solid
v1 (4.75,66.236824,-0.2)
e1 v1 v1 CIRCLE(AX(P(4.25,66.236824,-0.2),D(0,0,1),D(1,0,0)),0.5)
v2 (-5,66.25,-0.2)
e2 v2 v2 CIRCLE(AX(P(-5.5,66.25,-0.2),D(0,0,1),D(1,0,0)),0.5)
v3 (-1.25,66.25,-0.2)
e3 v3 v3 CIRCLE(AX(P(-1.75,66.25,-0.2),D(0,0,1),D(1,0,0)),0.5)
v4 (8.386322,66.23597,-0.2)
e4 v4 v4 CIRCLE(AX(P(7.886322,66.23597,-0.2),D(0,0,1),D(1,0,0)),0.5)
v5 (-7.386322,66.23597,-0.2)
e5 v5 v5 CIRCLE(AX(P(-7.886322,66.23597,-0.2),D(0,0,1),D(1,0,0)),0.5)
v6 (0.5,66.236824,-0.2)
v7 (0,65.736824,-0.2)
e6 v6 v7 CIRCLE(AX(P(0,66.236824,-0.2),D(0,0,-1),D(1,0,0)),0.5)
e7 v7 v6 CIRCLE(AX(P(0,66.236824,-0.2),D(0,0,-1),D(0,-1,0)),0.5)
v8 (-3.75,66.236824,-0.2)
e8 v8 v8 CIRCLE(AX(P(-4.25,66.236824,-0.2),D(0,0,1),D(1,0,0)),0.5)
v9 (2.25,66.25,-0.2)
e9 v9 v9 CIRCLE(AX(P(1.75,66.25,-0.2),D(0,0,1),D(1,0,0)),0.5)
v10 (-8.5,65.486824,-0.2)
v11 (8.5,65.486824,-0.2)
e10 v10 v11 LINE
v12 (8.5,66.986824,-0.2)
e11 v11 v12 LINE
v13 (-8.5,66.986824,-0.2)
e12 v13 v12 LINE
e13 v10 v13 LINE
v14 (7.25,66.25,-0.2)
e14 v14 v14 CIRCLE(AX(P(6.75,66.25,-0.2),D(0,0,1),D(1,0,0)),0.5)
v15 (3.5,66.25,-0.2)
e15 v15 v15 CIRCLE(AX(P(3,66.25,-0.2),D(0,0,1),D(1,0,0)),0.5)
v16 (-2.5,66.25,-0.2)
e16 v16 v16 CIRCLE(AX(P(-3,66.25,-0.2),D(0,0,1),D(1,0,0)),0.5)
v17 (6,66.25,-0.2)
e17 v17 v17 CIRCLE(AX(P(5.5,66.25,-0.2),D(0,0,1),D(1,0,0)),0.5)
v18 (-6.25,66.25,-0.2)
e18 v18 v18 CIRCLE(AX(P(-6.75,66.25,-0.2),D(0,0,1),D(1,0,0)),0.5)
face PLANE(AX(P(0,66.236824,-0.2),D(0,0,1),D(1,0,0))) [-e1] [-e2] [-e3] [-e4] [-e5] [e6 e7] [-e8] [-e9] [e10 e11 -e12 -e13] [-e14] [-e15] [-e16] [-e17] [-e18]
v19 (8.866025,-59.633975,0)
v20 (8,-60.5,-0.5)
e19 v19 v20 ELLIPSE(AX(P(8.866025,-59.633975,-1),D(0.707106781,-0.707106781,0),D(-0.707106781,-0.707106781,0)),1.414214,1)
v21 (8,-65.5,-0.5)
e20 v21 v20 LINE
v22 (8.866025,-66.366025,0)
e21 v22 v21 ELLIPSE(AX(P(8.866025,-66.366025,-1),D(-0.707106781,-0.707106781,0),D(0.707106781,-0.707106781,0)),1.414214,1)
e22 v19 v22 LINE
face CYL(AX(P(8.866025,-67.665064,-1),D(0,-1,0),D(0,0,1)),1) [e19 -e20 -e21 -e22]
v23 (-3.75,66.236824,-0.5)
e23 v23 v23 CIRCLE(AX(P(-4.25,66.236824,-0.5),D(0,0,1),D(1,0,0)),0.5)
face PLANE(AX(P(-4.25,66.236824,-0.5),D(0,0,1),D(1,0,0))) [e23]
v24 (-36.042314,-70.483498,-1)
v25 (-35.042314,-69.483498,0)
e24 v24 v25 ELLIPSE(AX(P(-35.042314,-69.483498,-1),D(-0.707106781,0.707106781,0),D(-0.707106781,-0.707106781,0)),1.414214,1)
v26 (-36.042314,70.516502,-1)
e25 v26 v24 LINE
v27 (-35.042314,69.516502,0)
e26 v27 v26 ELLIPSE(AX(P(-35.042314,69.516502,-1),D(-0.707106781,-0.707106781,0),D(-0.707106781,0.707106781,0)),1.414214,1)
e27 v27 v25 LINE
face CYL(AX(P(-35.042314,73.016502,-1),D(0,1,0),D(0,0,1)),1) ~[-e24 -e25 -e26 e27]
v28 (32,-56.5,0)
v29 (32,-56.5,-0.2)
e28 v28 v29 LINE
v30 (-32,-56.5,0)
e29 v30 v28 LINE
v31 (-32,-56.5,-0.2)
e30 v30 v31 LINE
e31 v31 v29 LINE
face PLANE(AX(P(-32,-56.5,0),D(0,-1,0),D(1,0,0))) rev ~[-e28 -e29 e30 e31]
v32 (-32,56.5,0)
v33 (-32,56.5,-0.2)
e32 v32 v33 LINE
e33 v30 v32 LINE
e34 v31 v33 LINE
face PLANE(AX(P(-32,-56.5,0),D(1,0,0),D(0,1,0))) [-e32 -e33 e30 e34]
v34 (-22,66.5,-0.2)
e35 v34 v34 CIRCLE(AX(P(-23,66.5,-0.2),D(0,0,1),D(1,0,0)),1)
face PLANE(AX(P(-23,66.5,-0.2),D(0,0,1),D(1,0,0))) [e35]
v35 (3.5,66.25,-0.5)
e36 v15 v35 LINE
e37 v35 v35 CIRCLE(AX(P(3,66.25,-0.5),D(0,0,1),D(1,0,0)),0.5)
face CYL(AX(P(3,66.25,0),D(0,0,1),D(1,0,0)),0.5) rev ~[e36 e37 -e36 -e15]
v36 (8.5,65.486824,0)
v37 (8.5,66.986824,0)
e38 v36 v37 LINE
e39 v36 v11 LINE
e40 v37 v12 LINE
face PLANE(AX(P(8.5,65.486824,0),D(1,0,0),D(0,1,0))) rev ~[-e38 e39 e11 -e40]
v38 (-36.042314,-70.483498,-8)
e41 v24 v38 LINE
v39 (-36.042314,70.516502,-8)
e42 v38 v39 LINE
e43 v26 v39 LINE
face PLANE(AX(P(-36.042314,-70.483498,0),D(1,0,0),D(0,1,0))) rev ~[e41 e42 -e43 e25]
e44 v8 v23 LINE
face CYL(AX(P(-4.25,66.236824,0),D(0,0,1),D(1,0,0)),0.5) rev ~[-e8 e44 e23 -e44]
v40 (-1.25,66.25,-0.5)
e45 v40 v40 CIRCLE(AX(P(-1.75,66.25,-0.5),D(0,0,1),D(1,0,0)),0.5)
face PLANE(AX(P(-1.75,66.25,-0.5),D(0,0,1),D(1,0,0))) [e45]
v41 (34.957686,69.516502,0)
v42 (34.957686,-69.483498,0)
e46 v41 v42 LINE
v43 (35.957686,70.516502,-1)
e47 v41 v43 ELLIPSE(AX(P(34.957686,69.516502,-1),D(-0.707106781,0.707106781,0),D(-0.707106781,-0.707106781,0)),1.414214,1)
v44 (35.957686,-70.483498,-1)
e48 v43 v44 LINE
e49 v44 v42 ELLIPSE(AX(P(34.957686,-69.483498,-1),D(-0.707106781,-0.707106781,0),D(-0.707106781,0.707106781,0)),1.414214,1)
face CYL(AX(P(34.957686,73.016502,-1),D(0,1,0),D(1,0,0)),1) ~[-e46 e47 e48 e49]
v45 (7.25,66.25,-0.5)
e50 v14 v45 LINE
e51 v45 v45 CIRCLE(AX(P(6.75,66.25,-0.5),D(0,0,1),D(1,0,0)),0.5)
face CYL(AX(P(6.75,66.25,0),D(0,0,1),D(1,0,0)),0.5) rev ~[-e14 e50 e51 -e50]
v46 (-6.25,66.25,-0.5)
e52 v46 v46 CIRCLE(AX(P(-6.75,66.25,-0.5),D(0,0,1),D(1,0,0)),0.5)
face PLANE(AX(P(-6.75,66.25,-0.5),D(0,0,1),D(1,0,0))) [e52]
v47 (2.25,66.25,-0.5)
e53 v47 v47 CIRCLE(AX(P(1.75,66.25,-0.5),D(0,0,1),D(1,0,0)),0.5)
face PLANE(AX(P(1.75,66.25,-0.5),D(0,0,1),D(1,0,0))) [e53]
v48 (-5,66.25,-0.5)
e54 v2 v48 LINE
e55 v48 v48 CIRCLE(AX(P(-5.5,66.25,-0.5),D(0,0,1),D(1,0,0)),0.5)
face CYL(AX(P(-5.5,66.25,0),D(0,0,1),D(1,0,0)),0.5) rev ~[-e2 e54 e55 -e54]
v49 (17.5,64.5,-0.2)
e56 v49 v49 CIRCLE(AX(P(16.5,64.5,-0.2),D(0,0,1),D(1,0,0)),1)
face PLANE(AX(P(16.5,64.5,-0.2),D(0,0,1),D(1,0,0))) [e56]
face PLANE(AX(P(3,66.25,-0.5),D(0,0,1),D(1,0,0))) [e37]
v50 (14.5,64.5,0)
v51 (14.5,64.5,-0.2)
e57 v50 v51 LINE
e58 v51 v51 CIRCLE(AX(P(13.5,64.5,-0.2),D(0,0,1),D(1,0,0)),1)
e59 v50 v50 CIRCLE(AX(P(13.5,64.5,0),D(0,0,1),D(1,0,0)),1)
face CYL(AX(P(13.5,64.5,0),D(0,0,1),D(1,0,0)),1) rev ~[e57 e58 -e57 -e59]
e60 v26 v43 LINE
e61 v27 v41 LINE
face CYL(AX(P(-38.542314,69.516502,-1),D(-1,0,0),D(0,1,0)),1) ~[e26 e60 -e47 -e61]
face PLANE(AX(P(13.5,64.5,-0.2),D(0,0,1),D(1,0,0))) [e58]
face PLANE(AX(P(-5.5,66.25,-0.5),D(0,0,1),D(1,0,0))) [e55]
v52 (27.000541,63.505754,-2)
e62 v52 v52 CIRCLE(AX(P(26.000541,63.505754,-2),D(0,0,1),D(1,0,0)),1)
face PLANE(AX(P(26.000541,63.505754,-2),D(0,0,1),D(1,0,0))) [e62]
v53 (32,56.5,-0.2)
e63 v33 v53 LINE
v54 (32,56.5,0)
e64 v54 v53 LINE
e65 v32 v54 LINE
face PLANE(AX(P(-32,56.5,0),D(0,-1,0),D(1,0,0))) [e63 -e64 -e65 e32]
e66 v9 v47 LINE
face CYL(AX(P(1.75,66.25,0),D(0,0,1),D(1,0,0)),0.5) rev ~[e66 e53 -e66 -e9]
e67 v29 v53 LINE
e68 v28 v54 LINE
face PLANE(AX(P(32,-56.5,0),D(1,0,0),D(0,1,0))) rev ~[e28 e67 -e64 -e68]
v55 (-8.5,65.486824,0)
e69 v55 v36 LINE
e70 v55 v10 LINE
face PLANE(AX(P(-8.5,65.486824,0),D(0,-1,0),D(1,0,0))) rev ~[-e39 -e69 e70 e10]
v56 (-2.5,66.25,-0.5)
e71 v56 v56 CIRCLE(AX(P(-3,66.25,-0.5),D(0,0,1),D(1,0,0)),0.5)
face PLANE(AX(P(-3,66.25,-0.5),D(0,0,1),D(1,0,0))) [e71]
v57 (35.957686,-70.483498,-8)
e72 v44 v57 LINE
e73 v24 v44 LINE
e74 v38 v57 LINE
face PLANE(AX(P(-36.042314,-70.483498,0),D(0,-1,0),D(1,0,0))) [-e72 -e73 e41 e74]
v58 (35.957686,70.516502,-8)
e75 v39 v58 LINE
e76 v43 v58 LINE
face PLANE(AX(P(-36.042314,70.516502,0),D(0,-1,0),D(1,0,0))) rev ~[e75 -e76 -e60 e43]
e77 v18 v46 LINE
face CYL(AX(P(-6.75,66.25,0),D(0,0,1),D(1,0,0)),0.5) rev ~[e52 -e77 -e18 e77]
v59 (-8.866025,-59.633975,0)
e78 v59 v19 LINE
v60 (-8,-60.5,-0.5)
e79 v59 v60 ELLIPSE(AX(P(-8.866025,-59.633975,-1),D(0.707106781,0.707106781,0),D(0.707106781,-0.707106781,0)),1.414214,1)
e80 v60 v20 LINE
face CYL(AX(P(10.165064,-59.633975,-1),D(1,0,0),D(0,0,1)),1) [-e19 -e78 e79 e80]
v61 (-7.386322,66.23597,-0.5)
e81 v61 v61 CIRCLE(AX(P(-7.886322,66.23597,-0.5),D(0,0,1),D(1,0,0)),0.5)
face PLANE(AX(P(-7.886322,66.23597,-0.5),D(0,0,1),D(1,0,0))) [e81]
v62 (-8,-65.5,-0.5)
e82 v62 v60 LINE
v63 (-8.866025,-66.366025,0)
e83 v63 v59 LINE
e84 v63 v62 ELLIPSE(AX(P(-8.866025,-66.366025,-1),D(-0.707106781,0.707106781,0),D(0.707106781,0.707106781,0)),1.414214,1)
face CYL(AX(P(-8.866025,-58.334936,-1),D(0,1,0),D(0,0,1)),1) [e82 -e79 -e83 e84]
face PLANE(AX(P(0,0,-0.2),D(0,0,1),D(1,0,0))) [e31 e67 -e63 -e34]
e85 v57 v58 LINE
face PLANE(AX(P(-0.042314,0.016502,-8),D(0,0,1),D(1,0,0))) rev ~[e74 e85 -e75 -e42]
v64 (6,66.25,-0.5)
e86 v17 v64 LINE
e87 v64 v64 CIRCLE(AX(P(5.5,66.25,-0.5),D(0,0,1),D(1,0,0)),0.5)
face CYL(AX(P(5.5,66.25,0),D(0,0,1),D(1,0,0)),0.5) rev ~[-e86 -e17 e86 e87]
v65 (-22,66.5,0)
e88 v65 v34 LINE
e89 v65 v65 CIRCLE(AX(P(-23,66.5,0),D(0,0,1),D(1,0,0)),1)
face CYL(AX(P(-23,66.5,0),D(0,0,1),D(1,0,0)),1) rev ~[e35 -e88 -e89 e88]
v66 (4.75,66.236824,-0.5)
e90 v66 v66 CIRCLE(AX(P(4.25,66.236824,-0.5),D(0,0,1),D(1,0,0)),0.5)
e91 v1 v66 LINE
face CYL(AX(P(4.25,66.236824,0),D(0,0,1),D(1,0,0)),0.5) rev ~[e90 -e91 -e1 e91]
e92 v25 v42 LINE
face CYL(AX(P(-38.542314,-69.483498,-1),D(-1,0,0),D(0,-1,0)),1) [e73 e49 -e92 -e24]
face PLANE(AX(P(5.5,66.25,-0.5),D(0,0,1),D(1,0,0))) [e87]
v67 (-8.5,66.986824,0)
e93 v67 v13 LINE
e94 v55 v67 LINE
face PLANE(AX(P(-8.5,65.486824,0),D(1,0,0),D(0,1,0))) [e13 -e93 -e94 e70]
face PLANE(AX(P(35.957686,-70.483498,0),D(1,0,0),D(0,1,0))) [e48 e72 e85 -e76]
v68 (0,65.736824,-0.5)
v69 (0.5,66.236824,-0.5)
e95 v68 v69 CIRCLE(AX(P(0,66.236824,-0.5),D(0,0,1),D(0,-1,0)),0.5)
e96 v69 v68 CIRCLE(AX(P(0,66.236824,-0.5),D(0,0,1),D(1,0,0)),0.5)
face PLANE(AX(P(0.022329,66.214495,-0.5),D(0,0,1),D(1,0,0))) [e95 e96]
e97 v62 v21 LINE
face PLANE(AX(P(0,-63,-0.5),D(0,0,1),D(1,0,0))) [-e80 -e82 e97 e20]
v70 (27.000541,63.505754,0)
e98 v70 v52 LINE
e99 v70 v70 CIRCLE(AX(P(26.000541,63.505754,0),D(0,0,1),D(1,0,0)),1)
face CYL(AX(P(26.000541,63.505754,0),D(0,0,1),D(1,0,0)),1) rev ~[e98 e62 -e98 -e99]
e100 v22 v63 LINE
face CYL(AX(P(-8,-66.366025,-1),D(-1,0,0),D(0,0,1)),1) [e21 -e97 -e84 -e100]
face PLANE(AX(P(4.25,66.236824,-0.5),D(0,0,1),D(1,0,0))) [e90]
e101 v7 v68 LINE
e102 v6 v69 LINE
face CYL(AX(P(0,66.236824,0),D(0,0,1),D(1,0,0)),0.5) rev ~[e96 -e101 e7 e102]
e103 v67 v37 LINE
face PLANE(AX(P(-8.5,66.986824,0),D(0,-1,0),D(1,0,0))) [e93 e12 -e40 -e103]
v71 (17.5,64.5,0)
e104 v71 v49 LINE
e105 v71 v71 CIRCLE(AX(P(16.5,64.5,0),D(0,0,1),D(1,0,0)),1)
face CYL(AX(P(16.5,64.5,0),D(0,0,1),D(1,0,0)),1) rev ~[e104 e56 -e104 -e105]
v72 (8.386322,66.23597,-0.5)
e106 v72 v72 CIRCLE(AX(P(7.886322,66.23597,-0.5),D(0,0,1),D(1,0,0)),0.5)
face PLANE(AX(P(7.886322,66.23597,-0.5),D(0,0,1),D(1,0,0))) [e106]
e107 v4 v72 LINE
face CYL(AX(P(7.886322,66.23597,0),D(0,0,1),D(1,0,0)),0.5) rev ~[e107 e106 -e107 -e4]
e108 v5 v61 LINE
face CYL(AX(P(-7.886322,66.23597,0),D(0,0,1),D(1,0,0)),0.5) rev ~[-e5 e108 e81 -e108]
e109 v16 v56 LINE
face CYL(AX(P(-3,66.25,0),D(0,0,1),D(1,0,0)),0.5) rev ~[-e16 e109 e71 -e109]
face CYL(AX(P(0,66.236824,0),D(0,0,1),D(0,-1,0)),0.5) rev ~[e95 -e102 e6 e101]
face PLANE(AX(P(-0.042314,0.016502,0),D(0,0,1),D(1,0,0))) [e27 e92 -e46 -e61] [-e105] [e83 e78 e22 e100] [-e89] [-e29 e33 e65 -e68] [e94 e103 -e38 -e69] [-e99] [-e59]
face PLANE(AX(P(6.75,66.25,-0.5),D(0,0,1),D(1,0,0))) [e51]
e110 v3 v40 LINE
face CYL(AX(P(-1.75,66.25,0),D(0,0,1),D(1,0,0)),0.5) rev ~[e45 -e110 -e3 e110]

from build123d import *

# Parameters (mm, degrees)
F1_W         = 72
F1_H         = 141
F2_DEPTH     = 8
F0_R         = 1
F3_DEPTH     = 0.2
F0_W         = 64
F0_H         = 113
F0_W_2       = 17
F0_H_2       = 1.5
F0_R_2       = 0.5
F4_DEPTH     = 0.2
F5_DEPTH     = 0.5
F1_R         = 1
F6_DEPTH     = 2
F0_W_3       = 16
F0_H_3       = 5
F7_DEPTH     = 0.5
F8_T1_DEPTH  = 77
F8_T3_DEPTH  = 146
F8_T5_DEPTH  = 16
F8_T7_DEPTH  = 5
F8_T13_DEPTH = 7.1650635095
F8_T17_DEPTH = 18.1650635095
F8_T24_DEPTH = 18.1650635095
F8_T28_DEPTH = 7.1650635095
F8_T35_DEPTH = 7.1650635095
F8_T39_DEPTH = 18.1650635095
F8_T46_DEPTH = 7.1650635095
F8_T50_DEPTH = 18.1650635095


# Not quite as in the source:
# - a fillet or chamfer that OpenCascade refuses, or shapes differently, is made with other operations: its cross-section is extruded or revolved along the edge and cut away or added


with BuildPart() as f2:
    # F1 (on face) → F2 (new body)
    with BuildSketch(Plane.XY):
        with Locations((-0.0423140228, 0.0165017247)):
            Rectangle(F1_W, F1_H)
    extrude(amount=-F2_DEPTH)

    # F0 (on Top) → F3 (cut)
    with BuildSketch(Plane.XY):
        with Locations((-23, 66.5)):
            Circle(F0_R)
        with Locations((13.5, 64.5)):
            Circle(F0_R)
        with Locations((16.5, 64.5)):
            Circle(F0_R)
    extrude(amount=-F3_DEPTH, mode=Mode.SUBTRACT)

    # F0 (on Top) → F4 (cut)
    with BuildSketch(Plane.XY):
        Rectangle(F0_W, F0_H)
        with Locations((0, 66.2368237972)):
            Rectangle(F0_W_2, F0_H_2)
        with Locations((-7.8863224118, 66.2359703599)):
            Circle(F0_R_2, mode=Mode.SUBTRACT)
        with Locations((-6.75, 66.25)):
            Circle(F0_R_2, mode=Mode.SUBTRACT)
        with Locations((-5.5, 66.25)):
            Circle(F0_R_2, mode=Mode.SUBTRACT)
        with Locations((-4.25, 66.2368237972)):
            Circle(F0_R_2, mode=Mode.SUBTRACT)
        with Locations((-3, 66.25)):
            Circle(F0_R_2, mode=Mode.SUBTRACT)
        with Locations((-1.75, 66.25)):
            Circle(F0_R_2, mode=Mode.SUBTRACT)
        with BuildLine():
            ThreePointArc((0, 65.7368237972), (-0.3535533906, 66.5903771878), (0.5, 66.2368237972))
            ThreePointArc((0.5, 66.2368237972), (0.3535533906, 65.8832704066), (0, 65.7368237972))
        make_face(mode=Mode.SUBTRACT)
        with Locations((1.75, 66.25)):
            Circle(F0_R_2, mode=Mode.SUBTRACT)
        with Locations((3, 66.25)):
            Circle(F0_R_2, mode=Mode.SUBTRACT)
        with Locations((4.25, 66.2368237972)):
            Circle(F0_R_2, mode=Mode.SUBTRACT)
        with Locations((5.5, 66.25)):
            Circle(F0_R_2, mode=Mode.SUBTRACT)
        with Locations((6.75, 66.25)):
            Circle(F0_R_2, mode=Mode.SUBTRACT)
        with Locations((7.8863224118, 66.2359703599)):
            Circle(F0_R_2, mode=Mode.SUBTRACT)
    extrude(amount=-F4_DEPTH, mode=Mode.SUBTRACT)

    # F0 (on Top) → F5 (cut)
    with BuildSketch(Plane.XY):
        with Locations((-7.8863224118, 66.2359703599)):
            Circle(F0_R_2)
        with Locations((-6.75, 66.25)):
            Circle(F0_R_2)
        with Locations((1.75, 66.25)):
            Circle(F0_R_2)
        with Locations((3, 66.25)):
            Circle(F0_R_2)
        with BuildLine():
            ThreePointArc((0, 65.7368237972), (0.3535533906, 65.8832704066), (0.5, 66.2368237972))
            ThreePointArc((0.5, 66.2368237972), (-0.3535533906, 66.5903771878), (0, 65.7368237972))
        make_face()
        with Locations((-4.25, 66.2368237972)):
            Circle(F0_R_2)
        with Locations((-3, 66.25)):
            Circle(F0_R_2)
        with Locations((-1.75, 66.25)):
            Circle(F0_R_2)
        with Locations((4.25, 66.2368237972)):
            Circle(F0_R_2)
        with Locations((5.5, 66.25)):
            Circle(F0_R_2)
        with Locations((6.75, 66.25)):
            Circle(F0_R_2)
        with Locations((7.8863224118, 66.2359703599)):
            Circle(F0_R_2)
        with Locations((-5.5, 66.25)):
            Circle(F0_R_2)
    extrude(amount=-F5_DEPTH, mode=Mode.SUBTRACT)

    # F1 (on face) → F6 (cut)
    with BuildSketch(Plane.XY):
        with Locations((26.0005407035, 63.5057538748)):
            Circle(F1_R)
    extrude(amount=-F6_DEPTH, mode=Mode.SUBTRACT)

    # F0 (on Top) → F7 (cut)
    with BuildSketch(Plane.XY):
        with Locations((0, -63)):
            Rectangle(F0_W_3, F0_H_3)
    extrude(amount=-F7_DEPTH, mode=Mode.SUBTRACT)

    # F8: fillet of radius 1 on 8 edges, made by hand

    # F8_s2 → F8_t1 (cut)
    with BuildSketch(Plane.YZ.offset(-38.5423140228)):
        with BuildLine():
            ThreePointArc((70.5165017247, -1), (70.2236085059, -0.2928932188), (69.5165017247, 0))
            Line((69.5165017247, 0), (70.5165017247, 0))
            Line((70.5165017247, 0), (70.5165017247, -1))
        make_face()
        with BuildLine():
            ThreePointArc((-70.4834982753, -1), (-70.1906050565, -0.2928932188), (-69.4834982753, 0))
            Line((-69.4834982753, 0), (-70.4834982753, 0))
            Line((-70.4834982753, 0), (-70.4834982753, -1))
        make_face()
    extrude(amount=F8_T1_DEPTH, mode=Mode.SUBTRACT)

    # F8_s4 → F8_t3 (cut)
    with BuildSketch(Plane.XZ.offset(-73.0165017247)):
        with BuildLine():
            ThreePointArc((-35.0423140228, 0), (-35.749420804, -0.2928932188), (-36.0423140228, -1))
            Line((-36.0423140228, -1), (-36.0423140228, 0))
            Line((-36.0423140228, 0), (-35.0423140228, 0))
        make_face()
        with BuildLine():
            ThreePointArc((35.9576859772, -1), (35.6647927584, -0.2928932188), (34.9576859772, 0))
            Line((34.9576859772, 0), (35.9576859772, 0))
            Line((35.9576859772, 0), (35.9576859772, -1))
        make_face()
    extrude(amount=F8_T3_DEPTH, mode=Mode.SUBTRACT)

    # F8_s6 → F8_t5 (cut)
    with BuildSketch(Plane.YZ.offset(-8)):
        with BuildLine():
            ThreePointArc((-59.6339745962, 0), (-60.1339745962, -0.1339745962), (-60.5, -0.5))
            Line((-60.5, -0.5), (-60.5, 0))
            Line((-60.5, 0), (-59.6339745962, 0))
        make_face()
        with BuildLine():
            ThreePointArc((-66.3660254038, 0), (-65.8660254038, -0.1339745962), (-65.5, -0.5))
            Line((-65.5, -0.5), (-65.5, 0))
            Line((-65.5, 0), (-66.3660254038, 0))
        make_face()
    extrude(amount=F8_T5_DEPTH, mode=Mode.SUBTRACT)

    # F8_s8 → F8_t7 (cut)
    with BuildSketch(Plane.XZ.offset(60.5)):
        with BuildLine():
            ThreePointArc((-8.8660254038, 0), (-8.3660254038, -0.1339745962), (-8, -0.5))
            Line((-8, -0.5), (-8, 0))
            Line((-8, 0), (-8.8660254038, 0))
        make_face()
        with BuildLine():
            ThreePointArc((8.8660254038, 0), (8.3660254038, -0.1339745962), (8, -0.5))
            Line((8, -0.5), (8, 0))
            Line((8, 0), (8.8660254038, 0))
        make_face()
    extrude(amount=F8_T7_DEPTH, mode=Mode.SUBTRACT)


with BuildPart() as f8_tool11:
    # F8_s12 → F8_t13 (new body)
    with BuildSketch(Plane.XZ.offset(65.5)):
        with BuildLine():
            ThreePointArc((8.8660254038, 0), (8.3660254038, -0.1339745962), (8, -0.5))
            Line((8, -0.5), (8, 0))
            Line((8, 0), (8.8660254038, 0))
        make_face()
    extrude(amount=-F8_T13_DEPTH)

    split(bisect_by=Plane.XZ.offset(60.5), keep=Keep.BOTTOM)


with BuildPart() as f8_tool15:
    # F8_s16 → F8_t17 (new body)
    with BuildSketch(Plane.YZ.offset(10.1650635095)):
        with BuildLine():
            ThreePointArc((-59.6339745962, 0), (-60.1339745962, -0.1339745962), (-60.5, -0.5))
            Line((-60.5, -0.5), (-60.5, 0))
            Line((-60.5, 0), (-59.6339745962, 0))
        make_face()
    extrude(amount=-F8_T17_DEPTH)

    split(bisect_by=Plane.YZ.offset(8), keep=Keep.TOP)


with BuildPart() as f8_tool11_1:
    add(f8_tool11.part)

    # F8_t19: intersect F8_tool15
    add(f8_tool15.part, mode=Mode.INTERSECT)


with BuildPart() as f2_1:
    add(f2.part)

    # F8_t9: cut F8_tool11
    add(f8_tool11_1.part, mode=Mode.SUBTRACT)


with BuildPart() as f8_tool22:
    # F8_s23 → F8_t24 (new body)
    with BuildSketch(Plane.YZ.offset(8)):
        with BuildLine():
            ThreePointArc((-59.6339745962, 0), (-60.1339745962, -0.1339745962), (-60.5, -0.5))
            Line((-60.5, -0.5), (-60.5, 0))
            Line((-60.5, 0), (-59.6339745962, 0))
        make_face()
    extrude(amount=-F8_T24_DEPTH)

    split(bisect_by=Plane.YZ.offset(-8), keep=Keep.BOTTOM)


with BuildPart() as f8_tool26:
    # F8_s27 → F8_t28 (new body)
    with BuildSketch(Plane.XZ.offset(58.3349364905)):
        with BuildLine():
            ThreePointArc((-8.8660254038, 0), (-8.3660254038, -0.1339745962), (-8, -0.5))
            Line((-8, -0.5), (-8, 0))
            Line((-8, 0), (-8.8660254038, 0))
        make_face()
    extrude(amount=F8_T28_DEPTH)

    split(bisect_by=Plane.XZ.offset(60.5), keep=Keep.BOTTOM)


with BuildPart() as f8_tool22_1:
    add(f8_tool22.part)

    # F8_t30: intersect F8_tool26
    add(f8_tool26.part, mode=Mode.INTERSECT)


with BuildPart() as f2_2:
    add(f2_1.part)

    # F8_t20: cut F8_tool22
    add(f8_tool22_1.part, mode=Mode.SUBTRACT)


with BuildPart() as f8_tool33:
    # F8_s34 → F8_t35 (new body)
    with BuildSketch(Plane.XZ.offset(60.5)):
        with BuildLine():
            ThreePointArc((-8.8660254038, 0), (-8.3660254038, -0.1339745962), (-8, -0.5))
            Line((-8, -0.5), (-8, 0))
            Line((-8, 0), (-8.8660254038, 0))
        make_face()
    extrude(amount=F8_T35_DEPTH)

    split(bisect_by=Plane.XZ.offset(65.5), keep=Keep.TOP)


with BuildPart() as f8_tool37:
    # F8_s38 → F8_t39 (new body)
    with BuildSketch(Plane.YZ.offset(-10.1650635095)):
        with BuildLine():
            ThreePointArc((-66.3660254038, 0), (-65.8660254038, -0.1339745962), (-65.5, -0.5))
            Line((-65.5, -0.5), (-65.5, 0))
            Line((-65.5, 0), (-66.3660254038, 0))
        make_face()
    extrude(amount=F8_T39_DEPTH)

    split(bisect_by=Plane.YZ.offset(-8), keep=Keep.BOTTOM)


with BuildPart() as f8_tool33_1:
    add(f8_tool33.part)

    # F8_t41: intersect F8_tool37
    add(f8_tool37.part, mode=Mode.INTERSECT)


with BuildPart() as f2_3:
    add(f2_2.part)

    # F8_t31: cut F8_tool33
    add(f8_tool33_1.part, mode=Mode.SUBTRACT)


with BuildPart() as f8_tool44:
    # F8_s45 → F8_t46 (new body)
    with BuildSketch(Plane.XZ.offset(67.6650635095)):
        with BuildLine():
            ThreePointArc((8.8660254038, 0), (8.3660254038, -0.1339745962), (8, -0.5))
            Line((8, -0.5), (8, 0))
            Line((8, 0), (8.8660254038, 0))
        make_face()
    extrude(amount=-F8_T46_DEPTH)

    split(bisect_by=Plane.XZ.offset(65.5), keep=Keep.TOP)


with BuildPart() as f8_tool48:
    # F8_s49 → F8_t50 (new body)
    with BuildSketch(Plane.YZ.offset(-8)):
        with BuildLine():
            ThreePointArc((-66.3660254038, 0), (-65.8660254038, -0.1339745962), (-65.5, -0.5))
            Line((-65.5, -0.5), (-65.5, 0))
            Line((-65.5, 0), (-66.3660254038, 0))
        make_face()
    extrude(amount=F8_T50_DEPTH)

    split(bisect_by=Plane.YZ.offset(8), keep=Keep.TOP)


with BuildPart() as f8_tool44_1:
    add(f8_tool44.part)

    # F8_t52: intersect F8_tool48
    add(f8_tool48.part, mode=Mode.INTERSECT)


with BuildPart() as f2_4:
    add(f2_3.part)

    # F8_t42: cut F8_tool44
    add(f8_tool44_1.part, mode=Mode.SUBTRACT)


solid = f2_4.part
